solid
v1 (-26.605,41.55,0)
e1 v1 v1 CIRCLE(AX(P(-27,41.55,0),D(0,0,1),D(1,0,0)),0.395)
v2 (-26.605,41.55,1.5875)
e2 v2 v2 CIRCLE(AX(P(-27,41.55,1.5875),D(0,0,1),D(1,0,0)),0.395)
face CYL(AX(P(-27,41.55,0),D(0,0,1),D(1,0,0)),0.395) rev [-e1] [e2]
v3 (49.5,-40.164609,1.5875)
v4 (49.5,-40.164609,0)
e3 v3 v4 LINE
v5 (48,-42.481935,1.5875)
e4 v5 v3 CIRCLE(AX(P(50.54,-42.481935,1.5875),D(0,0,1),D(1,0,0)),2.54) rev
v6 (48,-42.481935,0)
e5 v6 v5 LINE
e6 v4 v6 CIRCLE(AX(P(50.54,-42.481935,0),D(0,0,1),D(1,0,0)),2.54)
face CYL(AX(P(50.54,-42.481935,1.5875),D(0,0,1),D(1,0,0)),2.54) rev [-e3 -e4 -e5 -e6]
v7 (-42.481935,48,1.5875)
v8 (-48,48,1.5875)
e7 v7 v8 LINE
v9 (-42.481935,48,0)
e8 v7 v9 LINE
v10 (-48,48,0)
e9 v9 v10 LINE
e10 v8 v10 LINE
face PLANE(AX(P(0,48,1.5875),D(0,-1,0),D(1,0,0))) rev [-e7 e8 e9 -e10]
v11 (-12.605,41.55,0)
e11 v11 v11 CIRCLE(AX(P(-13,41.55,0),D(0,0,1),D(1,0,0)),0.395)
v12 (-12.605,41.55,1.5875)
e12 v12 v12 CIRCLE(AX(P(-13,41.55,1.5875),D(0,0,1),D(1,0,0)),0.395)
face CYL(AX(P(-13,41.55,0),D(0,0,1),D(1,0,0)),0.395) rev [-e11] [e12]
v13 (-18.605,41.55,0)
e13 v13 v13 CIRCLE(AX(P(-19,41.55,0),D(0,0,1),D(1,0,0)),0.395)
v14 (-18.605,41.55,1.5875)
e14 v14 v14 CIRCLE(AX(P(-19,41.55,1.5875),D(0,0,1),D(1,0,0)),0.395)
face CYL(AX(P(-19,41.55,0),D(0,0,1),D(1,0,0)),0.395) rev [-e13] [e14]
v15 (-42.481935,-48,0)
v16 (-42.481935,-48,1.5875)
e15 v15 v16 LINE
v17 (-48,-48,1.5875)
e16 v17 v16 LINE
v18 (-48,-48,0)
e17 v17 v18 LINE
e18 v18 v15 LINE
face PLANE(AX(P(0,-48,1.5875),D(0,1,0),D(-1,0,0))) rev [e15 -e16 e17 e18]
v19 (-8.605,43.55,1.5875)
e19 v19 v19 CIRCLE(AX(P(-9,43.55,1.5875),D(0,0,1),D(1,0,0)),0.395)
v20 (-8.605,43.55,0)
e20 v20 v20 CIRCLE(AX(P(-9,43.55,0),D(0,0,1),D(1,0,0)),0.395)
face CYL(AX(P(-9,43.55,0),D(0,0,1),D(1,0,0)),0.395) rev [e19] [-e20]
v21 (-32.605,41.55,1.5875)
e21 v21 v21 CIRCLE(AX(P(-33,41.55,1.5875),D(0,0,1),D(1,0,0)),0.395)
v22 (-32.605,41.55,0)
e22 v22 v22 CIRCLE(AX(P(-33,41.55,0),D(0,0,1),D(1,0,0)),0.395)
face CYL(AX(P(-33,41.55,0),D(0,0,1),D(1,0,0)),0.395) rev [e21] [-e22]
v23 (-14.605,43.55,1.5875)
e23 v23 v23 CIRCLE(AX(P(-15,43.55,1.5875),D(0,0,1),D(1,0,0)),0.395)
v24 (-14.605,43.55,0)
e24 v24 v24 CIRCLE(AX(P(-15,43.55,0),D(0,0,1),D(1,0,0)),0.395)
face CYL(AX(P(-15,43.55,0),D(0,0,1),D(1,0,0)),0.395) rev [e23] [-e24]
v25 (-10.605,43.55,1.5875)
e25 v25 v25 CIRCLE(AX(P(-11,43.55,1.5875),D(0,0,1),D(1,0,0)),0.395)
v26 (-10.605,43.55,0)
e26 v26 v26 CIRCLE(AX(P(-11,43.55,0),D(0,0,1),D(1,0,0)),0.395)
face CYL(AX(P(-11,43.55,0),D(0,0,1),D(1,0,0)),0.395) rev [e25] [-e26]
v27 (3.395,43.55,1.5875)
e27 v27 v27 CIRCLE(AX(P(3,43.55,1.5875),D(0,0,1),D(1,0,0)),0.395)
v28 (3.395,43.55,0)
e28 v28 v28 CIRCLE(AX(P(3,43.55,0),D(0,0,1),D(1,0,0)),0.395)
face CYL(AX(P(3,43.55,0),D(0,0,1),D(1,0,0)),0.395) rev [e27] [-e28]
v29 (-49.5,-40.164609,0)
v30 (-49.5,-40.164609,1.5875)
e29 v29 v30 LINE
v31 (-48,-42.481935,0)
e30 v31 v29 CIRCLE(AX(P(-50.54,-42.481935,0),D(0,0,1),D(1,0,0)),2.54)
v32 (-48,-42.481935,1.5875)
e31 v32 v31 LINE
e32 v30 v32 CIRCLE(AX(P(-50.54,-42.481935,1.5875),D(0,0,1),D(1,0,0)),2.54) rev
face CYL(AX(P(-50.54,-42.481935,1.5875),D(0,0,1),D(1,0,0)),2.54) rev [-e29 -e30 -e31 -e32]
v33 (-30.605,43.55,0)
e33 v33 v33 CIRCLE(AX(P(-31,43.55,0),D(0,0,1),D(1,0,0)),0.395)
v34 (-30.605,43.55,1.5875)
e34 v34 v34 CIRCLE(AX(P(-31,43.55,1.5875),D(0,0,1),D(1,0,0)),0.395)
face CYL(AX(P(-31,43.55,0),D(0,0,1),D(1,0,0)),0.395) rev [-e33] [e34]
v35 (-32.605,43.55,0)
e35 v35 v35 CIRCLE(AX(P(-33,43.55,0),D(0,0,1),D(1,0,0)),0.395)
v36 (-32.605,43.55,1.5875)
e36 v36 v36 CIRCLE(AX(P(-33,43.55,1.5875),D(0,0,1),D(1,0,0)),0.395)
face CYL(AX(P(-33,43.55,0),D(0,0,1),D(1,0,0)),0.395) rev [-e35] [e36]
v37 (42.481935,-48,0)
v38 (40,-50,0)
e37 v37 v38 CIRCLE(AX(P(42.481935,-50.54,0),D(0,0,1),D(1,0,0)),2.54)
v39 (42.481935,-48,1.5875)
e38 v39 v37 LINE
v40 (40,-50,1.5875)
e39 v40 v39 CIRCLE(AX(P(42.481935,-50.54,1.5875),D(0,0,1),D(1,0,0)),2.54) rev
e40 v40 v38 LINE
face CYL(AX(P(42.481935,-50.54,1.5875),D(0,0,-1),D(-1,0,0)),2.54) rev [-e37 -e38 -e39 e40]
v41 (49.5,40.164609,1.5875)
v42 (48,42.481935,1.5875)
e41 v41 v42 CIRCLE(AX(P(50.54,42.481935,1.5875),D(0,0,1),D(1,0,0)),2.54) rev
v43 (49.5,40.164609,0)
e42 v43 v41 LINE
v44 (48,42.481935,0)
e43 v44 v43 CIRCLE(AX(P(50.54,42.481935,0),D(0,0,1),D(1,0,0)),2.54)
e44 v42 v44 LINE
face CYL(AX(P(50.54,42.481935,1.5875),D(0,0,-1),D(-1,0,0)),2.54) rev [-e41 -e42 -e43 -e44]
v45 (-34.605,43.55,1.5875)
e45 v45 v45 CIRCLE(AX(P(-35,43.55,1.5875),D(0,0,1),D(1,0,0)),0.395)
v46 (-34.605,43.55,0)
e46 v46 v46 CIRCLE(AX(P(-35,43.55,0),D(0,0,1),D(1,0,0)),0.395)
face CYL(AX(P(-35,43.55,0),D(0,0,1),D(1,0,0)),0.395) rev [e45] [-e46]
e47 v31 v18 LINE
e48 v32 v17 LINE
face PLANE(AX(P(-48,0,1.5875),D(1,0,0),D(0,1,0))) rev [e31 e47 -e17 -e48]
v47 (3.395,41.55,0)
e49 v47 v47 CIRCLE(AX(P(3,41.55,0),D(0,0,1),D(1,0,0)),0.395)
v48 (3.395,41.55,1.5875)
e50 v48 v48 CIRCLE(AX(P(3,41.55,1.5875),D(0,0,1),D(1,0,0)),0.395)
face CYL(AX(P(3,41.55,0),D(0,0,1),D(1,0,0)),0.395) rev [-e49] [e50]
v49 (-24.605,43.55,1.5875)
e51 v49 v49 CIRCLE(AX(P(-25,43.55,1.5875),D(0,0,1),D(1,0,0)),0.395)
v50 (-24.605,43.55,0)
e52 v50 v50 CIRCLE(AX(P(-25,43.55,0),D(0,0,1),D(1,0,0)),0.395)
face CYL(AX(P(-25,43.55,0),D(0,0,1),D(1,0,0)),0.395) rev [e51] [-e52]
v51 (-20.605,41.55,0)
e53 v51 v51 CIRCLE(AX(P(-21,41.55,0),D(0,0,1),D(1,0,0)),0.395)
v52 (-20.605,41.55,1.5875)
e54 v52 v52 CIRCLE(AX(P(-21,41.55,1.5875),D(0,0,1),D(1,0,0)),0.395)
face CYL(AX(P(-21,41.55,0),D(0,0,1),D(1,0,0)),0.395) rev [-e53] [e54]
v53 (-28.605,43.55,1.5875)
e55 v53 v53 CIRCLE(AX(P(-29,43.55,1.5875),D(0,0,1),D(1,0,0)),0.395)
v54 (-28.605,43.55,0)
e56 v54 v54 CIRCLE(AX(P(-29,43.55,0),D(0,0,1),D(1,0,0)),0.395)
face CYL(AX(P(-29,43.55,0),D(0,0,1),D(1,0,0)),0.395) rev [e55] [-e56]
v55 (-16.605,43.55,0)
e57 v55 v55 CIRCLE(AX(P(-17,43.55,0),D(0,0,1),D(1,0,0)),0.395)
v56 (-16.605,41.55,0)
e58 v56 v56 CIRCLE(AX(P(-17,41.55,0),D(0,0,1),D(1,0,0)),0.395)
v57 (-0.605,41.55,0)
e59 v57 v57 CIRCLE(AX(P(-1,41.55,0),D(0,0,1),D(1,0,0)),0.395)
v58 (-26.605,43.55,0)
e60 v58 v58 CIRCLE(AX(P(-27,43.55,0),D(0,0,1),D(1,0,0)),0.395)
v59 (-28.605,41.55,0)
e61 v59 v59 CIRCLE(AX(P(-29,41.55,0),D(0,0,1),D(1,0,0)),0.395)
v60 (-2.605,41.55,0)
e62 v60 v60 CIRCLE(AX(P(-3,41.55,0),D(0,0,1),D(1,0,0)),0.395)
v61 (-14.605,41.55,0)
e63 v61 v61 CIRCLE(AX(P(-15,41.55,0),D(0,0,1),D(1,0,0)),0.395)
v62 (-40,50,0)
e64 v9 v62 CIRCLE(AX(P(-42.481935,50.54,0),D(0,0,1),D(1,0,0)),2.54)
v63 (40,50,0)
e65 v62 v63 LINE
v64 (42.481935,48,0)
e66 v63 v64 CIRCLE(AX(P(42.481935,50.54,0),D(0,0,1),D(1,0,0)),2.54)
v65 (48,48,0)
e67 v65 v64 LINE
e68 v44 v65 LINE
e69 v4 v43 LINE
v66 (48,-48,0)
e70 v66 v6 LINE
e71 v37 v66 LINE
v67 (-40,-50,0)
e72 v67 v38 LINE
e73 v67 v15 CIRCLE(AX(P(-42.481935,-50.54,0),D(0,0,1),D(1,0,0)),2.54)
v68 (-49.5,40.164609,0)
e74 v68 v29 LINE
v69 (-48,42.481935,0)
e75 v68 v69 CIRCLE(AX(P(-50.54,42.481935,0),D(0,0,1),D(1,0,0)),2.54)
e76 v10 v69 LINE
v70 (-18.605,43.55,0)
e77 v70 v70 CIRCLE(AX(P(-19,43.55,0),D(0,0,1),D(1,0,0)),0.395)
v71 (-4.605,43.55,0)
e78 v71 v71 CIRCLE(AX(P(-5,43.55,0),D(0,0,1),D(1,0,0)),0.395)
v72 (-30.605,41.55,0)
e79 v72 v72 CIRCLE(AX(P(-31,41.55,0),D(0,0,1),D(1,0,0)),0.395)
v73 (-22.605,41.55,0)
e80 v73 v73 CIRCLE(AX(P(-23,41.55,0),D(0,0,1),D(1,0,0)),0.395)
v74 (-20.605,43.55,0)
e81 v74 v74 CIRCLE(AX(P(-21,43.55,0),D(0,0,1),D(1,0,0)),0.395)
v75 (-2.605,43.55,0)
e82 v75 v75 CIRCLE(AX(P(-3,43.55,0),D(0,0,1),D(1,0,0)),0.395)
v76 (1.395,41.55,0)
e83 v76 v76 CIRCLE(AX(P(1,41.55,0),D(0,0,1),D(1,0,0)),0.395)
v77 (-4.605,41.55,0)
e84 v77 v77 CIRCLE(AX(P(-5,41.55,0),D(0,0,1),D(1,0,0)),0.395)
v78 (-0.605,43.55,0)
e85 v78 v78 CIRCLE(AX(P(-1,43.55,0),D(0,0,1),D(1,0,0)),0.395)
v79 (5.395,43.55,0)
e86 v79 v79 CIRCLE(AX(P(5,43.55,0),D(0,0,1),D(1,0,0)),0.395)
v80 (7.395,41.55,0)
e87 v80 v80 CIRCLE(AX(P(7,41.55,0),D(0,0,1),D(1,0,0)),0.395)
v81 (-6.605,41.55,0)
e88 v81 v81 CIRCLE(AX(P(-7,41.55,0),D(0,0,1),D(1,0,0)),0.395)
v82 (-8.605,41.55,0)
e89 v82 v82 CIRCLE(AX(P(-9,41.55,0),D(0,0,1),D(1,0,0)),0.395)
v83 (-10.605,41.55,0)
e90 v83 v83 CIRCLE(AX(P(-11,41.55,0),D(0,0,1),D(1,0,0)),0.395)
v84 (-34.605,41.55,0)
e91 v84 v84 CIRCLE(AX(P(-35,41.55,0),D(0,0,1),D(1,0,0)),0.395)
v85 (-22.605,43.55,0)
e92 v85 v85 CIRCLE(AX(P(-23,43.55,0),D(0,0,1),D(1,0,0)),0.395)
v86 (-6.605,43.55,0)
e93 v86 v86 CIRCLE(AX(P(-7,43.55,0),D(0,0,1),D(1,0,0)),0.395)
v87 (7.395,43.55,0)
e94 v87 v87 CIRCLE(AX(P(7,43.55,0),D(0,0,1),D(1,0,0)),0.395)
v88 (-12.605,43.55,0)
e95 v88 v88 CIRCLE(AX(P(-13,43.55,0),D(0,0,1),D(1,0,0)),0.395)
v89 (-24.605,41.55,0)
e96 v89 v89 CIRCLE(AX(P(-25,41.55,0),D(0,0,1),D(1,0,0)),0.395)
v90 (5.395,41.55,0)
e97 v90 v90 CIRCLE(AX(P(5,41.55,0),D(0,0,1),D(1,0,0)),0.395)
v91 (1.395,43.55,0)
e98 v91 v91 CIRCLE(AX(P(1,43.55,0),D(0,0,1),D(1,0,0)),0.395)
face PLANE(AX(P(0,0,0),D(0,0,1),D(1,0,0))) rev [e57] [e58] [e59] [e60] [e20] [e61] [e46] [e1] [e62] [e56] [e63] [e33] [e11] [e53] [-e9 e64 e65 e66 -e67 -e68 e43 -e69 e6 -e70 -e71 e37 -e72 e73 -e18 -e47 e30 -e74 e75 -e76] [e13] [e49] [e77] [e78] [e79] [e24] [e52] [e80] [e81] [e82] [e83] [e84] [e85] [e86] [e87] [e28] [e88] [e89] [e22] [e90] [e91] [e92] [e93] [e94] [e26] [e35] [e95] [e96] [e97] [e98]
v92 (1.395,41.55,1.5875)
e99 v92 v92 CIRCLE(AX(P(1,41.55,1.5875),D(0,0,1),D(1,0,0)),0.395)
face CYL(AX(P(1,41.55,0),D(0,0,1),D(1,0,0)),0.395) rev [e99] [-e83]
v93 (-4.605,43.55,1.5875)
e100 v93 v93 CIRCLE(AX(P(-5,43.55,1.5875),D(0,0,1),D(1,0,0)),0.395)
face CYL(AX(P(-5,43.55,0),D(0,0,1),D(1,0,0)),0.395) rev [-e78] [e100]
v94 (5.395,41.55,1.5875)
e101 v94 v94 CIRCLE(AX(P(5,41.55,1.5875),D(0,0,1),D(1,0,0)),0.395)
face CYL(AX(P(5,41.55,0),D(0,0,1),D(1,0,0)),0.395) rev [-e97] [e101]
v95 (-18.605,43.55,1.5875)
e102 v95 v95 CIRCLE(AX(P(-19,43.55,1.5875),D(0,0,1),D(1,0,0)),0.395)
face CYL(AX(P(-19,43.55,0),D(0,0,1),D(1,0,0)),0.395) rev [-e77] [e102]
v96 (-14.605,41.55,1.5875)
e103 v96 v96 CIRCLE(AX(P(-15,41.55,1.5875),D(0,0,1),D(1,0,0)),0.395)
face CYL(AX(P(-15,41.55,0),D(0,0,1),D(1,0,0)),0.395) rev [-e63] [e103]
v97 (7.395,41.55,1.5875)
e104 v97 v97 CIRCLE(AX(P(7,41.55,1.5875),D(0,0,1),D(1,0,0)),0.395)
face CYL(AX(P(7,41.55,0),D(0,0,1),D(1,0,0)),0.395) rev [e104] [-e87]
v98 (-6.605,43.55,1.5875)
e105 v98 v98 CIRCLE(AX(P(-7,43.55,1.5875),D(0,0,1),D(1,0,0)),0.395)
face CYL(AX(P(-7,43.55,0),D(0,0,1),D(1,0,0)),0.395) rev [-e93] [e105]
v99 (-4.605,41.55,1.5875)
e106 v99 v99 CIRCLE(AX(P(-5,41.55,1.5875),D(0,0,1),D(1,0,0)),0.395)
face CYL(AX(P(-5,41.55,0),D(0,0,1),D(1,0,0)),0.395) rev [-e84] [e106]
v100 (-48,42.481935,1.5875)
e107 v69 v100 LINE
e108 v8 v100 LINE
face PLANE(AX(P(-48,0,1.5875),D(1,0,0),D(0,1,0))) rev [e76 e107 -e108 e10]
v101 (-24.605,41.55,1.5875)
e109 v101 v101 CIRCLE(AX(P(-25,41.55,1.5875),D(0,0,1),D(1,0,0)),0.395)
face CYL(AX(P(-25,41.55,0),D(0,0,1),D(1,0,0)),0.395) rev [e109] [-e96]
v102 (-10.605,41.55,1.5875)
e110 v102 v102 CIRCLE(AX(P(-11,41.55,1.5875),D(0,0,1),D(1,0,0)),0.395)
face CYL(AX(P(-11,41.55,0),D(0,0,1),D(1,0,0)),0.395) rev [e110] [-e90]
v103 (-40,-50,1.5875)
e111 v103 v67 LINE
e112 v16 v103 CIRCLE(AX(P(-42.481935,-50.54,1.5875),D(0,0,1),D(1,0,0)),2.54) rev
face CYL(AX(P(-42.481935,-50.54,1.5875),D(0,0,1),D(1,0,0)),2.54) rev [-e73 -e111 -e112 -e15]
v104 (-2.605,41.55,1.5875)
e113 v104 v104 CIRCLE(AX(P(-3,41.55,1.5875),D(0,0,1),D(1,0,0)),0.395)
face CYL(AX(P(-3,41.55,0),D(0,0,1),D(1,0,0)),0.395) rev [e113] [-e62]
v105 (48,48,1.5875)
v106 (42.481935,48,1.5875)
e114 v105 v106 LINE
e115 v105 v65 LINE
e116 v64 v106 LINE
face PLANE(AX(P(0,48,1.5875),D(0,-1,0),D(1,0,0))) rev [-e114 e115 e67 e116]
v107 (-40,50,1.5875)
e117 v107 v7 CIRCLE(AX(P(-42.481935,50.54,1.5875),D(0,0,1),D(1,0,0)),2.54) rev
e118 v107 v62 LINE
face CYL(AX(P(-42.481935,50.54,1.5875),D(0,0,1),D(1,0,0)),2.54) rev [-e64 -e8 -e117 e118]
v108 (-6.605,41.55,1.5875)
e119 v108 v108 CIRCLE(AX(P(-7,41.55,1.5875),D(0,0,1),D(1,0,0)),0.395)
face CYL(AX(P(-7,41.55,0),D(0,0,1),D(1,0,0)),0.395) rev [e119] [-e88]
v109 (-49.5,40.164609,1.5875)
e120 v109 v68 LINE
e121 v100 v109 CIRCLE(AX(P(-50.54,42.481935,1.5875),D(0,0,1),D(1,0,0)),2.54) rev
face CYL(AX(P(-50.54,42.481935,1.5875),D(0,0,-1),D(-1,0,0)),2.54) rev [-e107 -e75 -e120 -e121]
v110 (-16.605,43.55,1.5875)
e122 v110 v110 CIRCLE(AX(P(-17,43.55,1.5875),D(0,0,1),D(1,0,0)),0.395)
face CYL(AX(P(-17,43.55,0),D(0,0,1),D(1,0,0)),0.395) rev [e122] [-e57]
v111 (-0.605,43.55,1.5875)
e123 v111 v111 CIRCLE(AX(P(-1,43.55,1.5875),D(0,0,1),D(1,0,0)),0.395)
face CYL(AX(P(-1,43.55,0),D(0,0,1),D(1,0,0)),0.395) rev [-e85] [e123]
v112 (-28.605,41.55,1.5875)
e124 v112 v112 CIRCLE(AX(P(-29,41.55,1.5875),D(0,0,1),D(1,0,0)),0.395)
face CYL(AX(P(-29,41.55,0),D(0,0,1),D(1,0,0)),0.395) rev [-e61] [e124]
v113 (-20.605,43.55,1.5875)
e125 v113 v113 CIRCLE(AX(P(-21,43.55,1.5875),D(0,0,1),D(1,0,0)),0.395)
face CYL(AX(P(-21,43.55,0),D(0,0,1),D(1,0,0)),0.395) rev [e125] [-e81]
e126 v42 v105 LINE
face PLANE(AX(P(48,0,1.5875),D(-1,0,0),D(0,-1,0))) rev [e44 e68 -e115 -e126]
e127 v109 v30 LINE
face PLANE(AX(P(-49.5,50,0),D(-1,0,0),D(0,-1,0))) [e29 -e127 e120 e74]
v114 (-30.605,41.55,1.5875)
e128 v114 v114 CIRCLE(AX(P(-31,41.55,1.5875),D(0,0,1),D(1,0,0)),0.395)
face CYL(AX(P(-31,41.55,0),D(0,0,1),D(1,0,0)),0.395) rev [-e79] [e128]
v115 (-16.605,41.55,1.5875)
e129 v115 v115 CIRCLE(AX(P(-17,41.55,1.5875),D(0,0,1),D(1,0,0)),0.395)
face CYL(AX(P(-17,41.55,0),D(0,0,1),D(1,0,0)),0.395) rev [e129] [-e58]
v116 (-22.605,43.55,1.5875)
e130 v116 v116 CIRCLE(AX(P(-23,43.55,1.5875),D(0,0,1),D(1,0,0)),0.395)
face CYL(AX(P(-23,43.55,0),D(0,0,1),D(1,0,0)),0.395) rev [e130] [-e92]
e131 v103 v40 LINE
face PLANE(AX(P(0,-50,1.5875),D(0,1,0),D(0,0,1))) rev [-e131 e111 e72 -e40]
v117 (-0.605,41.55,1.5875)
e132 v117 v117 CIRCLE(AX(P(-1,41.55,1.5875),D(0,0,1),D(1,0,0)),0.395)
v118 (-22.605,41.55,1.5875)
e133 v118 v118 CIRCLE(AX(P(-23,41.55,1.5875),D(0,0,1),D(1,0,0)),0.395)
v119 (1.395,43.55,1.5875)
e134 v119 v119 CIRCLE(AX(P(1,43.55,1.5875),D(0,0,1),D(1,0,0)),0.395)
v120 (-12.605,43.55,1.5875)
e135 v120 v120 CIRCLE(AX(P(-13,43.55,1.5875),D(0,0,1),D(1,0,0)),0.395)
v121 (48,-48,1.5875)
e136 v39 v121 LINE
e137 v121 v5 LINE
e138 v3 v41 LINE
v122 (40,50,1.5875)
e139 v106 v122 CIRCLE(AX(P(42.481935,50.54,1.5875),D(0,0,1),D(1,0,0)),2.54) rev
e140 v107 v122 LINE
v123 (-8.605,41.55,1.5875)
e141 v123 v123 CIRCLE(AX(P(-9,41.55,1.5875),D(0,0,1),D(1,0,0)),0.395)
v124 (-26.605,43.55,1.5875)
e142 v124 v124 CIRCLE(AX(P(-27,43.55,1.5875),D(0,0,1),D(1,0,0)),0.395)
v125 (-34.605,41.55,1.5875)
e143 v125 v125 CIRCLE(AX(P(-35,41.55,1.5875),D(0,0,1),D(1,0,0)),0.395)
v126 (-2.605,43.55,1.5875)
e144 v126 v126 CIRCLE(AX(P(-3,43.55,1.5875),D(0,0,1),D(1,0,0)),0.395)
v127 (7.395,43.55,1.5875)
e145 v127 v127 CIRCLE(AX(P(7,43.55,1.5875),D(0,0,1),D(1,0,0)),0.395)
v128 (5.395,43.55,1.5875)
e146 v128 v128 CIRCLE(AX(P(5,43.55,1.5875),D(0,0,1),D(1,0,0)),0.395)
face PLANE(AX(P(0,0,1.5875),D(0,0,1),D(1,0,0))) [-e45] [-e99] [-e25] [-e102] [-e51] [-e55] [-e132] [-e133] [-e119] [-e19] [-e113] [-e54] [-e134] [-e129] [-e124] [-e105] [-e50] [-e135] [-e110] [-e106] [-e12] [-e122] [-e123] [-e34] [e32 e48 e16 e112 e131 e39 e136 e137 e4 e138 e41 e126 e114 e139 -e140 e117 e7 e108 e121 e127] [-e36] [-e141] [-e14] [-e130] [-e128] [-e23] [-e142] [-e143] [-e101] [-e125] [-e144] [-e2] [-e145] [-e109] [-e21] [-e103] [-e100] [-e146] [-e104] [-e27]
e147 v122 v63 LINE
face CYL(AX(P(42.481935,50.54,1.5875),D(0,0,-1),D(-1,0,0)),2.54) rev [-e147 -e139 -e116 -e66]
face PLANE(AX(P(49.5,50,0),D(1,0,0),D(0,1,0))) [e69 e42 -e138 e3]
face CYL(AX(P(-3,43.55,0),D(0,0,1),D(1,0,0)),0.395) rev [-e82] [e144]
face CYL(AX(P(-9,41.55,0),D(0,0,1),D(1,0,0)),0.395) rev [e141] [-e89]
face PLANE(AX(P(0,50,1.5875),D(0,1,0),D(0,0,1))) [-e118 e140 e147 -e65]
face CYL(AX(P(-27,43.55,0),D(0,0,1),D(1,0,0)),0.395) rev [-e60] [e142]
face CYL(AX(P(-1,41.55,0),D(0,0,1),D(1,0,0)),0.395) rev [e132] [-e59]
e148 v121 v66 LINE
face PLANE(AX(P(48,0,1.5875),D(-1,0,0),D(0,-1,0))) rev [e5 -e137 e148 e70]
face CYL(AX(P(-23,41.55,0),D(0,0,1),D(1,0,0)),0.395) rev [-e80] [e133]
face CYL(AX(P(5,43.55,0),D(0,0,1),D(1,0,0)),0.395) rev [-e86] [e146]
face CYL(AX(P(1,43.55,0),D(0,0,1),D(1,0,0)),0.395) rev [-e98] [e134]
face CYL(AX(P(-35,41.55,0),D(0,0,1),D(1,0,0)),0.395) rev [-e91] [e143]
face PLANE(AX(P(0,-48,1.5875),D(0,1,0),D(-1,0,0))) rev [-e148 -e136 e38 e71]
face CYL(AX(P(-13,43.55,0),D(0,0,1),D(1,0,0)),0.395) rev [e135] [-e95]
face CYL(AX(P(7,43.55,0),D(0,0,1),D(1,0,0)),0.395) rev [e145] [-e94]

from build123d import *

# Parameters (mm, degrees)
BOSS_EXTRUDE1_DEPTH = 1.5875
FILLET1_R           = 2.54
SKETCH5_R           = 0.395
CUT_EXTRUDE1_DEPTH  = 71.728496069
SKETCH6_OUTSIDE_W   = 130.286
SKETCH6_OUTSIDE_H   = 130.286
SKETCH6_OUTSIDE_W_2 = 99
SKETCH6_OUTSIDE_H_2 = 100
CUT_EXTRUDE2_DEPTH  = 71.728496069


with BuildPart() as part:
    # Sketch1 → Boss-Extrude1 (new body)
    with BuildSketch(Plane.XY):
        Polygon((40, 50), (-40, 50), (-40, 48), (-48, 48), (-48, 40), (-50, 40), (-50, -37.864895224), (-50, -40), (-48, -40), (-48, -48), (-40, -48), (-40, -50), (-37.864895224, -50), (40, -50), (40, -48), (48, -48), (48, -40), (50, -40), (50, 40), (48, 40), (48, 48), (40, 48), align=None)
    extrude(amount=BOSS_EXTRUDE1_DEPTH)

    # Fillet1
    # the kernel refuses this fillet: 2.54 mm, written as the material it adds along each edge
    with BuildSketch(Plane(origin=(-48, -40, 0), x_dir=(0, -1, 0), z_dir=(0, 0, 1)), Plane(origin=(40, -48, 0), x_dir=(1, 0, 0), z_dir=(0, 0, 1)), Plane(origin=(48, 40, 0), x_dir=(0, 1, 0), z_dir=(0, 0, 1)), Plane(origin=(-40, 48, 0), x_dir=(-1, 0, 0), z_dir=(0, 0, 1))) as fillet1_piece_1:
        with BuildLine():
            CenterArc((2.481934729, -2.54), FILLET1_R, 90, 77.725329785)
            Line((0, -2), (-0.049638695, -1.9892))
            ThreePointArc((-0.049638695, -1.9892), (-0.0508, -1), (-0.0508, 0))
            Line((-0.0508, 0), (0, 0.0508))
            Line((0, 0.0508), (2.481934729, 0.0508))
            Line((2.481934729, 0.0508), (2.481934729, 0))
        make_face()
    extrude(amount=1.5875)
    with BuildSketch(Plane(origin=(-40, -48, 0), x_dir=(-3.737454790095179e-12, -1.0, 0), z_dir=(0, 0, 1)), Plane(origin=(48, -40, 0), x_dir=(1.0, -3.7339020764163554e-12, 0), z_dir=(0, 0, 1)), Plane(origin=(-48, 40, 0), x_dir=(-1.0, 3.737454790095126e-12, 0), z_dir=(0, 0, 1))) as fillet1_piece_2:
        with BuildLine():
            CenterArc((2.54, -2.481934729), FILLET1_R, 102.274670215, 77.725329785)
            Line((0, -2.481934729), (-0.0508, -2.481934729))
            Line((-0.0508, -2.481934729), (-0.0508, 0))
            Line((-0.0508, 0), (0, 0.0508))
            ThreePointArc((0, 0.0508), (1, 0.0508), (1.9892, 0.049638695))
            Line((1.9892, 0.049638695), (2, 0))
        make_face()
    extrude(amount=1.5875)
    with BuildSketch(Plane(origin=(40, 48, 0), x_dir=(1, 0, 0), z_dir=(0, 0, 1))) as fillet1_piece_3:
        with BuildLine():
            CenterArc((2.481934729, 2.54), FILLET1_R, 192.274670215, 77.725329785)
            Line((0, 2), (-0.049638695, 1.9892))
            ThreePointArc((-0.049638695, 1.9892), (-0.0508, 1), (-0.0508, 0))
            Line((-0.0508, 0), (0, -0.0508))
            Line((0, -0.0508), (2.481934729, -0.0508))
            Line((2.481934729, -0.0508), (2.481934729, 0))
        make_face()
    extrude(amount=1.5875)

    # Sketch5 → Cut-Extrude1 (cut, through all)
    with BuildSketch(Plane.XY.offset(1.5875)):
        with Locations((-35, 43.55)):
            Circle(SKETCH5_R)
        with Locations((-33, 43.55)):
            Circle(SKETCH5_R)
        with Locations((-31, 43.55)):
            Circle(SKETCH5_R)
        with Locations((-29, 43.55)):
            Circle(SKETCH5_R)
        with Locations((-27, 43.55)):
            Circle(SKETCH5_R)
        with Locations((-25, 43.55)):
            Circle(SKETCH5_R)
        with Locations((-23, 43.55)):
            Circle(SKETCH5_R)
        with Locations((-21, 43.55)):
            Circle(SKETCH5_R)
        with Locations((-19, 43.55)):
            Circle(SKETCH5_R)
        with Locations((-17, 43.55)):
            Circle(SKETCH5_R)
        with Locations((-15, 43.55)):
            Circle(SKETCH5_R)
        with Locations((-13, 43.55)):
            Circle(SKETCH5_R)
        with Locations((-11, 43.55)):
            Circle(SKETCH5_R)
        with Locations((-9, 43.55)):
            Circle(SKETCH5_R)
        with Locations((-7, 43.55)):
            Circle(SKETCH5_R)
        with Locations((-5, 43.55)):
            Circle(SKETCH5_R)
        with Locations((-3, 43.55)):
            Circle(SKETCH5_R)
        with Locations((-1, 43.55)):
            Circle(SKETCH5_R)
        with Locations((1, 43.55)):
            Circle(SKETCH5_R)
        with Locations((3, 43.55)):
            Circle(SKETCH5_R)
        with Locations((5, 43.55)):
            Circle(SKETCH5_R)
        with Locations((7, 43.55)):
            Circle(SKETCH5_R)
        with Locations((-33, 41.55)):
            Circle(SKETCH5_R)
        with Locations((-31, 41.55)):
            Circle(SKETCH5_R)
        with Locations((-29, 41.55)):
            Circle(SKETCH5_R)
        with Locations((-27, 41.55)):
            Circle(SKETCH5_R)
        with Locations((-25, 41.55)):
            Circle(SKETCH5_R)
        with Locations((-23, 41.55)):
            Circle(SKETCH5_R)
        with Locations((-21, 41.55)):
            Circle(SKETCH5_R)
        with Locations((-19, 41.55)):
            Circle(SKETCH5_R)
        with Locations((-17, 41.55)):
            Circle(SKETCH5_R)
        with Locations((-15, 41.55)):
            Circle(SKETCH5_R)
        with Locations((-13, 41.55)):
            Circle(SKETCH5_R)
        with Locations((-11, 41.55)):
            Circle(SKETCH5_R)
        with Locations((-9, 41.55)):
            Circle(SKETCH5_R)
        with Locations((-7, 41.55)):
            Circle(SKETCH5_R)
        with Locations((-5, 41.55)):
            Circle(SKETCH5_R)
        with Locations((-3, 41.55)):
            Circle(SKETCH5_R)
        with Locations((-1, 41.55)):
            Circle(SKETCH5_R)
        with Locations((1, 41.55)):
            Circle(SKETCH5_R)
        with Locations((3, 41.55)):
            Circle(SKETCH5_R)
        with Locations((5, 41.55)):
            Circle(SKETCH5_R)
        with Locations((7, 41.55)):
            Circle(SKETCH5_R)
        with Locations((-35, 41.55)):
            Circle(SKETCH5_R)
    extrude(amount=-CUT_EXTRUDE1_DEPTH, mode=Mode.SUBTRACT)

    # Sketch6 outside → Cut-Extrude2 (cut, through all)
    with BuildSketch(Plane.XY.offset(1.5875)):
        Rectangle(SKETCH6_OUTSIDE_W, SKETCH6_OUTSIDE_H)
        Rectangle(SKETCH6_OUTSIDE_W_2, SKETCH6_OUTSIDE_H_2, mode=Mode.SUBTRACT)
    extrude(amount=-CUT_EXTRUDE2_DEPTH, mode=Mode.SUBTRACT)


solid = part.part
